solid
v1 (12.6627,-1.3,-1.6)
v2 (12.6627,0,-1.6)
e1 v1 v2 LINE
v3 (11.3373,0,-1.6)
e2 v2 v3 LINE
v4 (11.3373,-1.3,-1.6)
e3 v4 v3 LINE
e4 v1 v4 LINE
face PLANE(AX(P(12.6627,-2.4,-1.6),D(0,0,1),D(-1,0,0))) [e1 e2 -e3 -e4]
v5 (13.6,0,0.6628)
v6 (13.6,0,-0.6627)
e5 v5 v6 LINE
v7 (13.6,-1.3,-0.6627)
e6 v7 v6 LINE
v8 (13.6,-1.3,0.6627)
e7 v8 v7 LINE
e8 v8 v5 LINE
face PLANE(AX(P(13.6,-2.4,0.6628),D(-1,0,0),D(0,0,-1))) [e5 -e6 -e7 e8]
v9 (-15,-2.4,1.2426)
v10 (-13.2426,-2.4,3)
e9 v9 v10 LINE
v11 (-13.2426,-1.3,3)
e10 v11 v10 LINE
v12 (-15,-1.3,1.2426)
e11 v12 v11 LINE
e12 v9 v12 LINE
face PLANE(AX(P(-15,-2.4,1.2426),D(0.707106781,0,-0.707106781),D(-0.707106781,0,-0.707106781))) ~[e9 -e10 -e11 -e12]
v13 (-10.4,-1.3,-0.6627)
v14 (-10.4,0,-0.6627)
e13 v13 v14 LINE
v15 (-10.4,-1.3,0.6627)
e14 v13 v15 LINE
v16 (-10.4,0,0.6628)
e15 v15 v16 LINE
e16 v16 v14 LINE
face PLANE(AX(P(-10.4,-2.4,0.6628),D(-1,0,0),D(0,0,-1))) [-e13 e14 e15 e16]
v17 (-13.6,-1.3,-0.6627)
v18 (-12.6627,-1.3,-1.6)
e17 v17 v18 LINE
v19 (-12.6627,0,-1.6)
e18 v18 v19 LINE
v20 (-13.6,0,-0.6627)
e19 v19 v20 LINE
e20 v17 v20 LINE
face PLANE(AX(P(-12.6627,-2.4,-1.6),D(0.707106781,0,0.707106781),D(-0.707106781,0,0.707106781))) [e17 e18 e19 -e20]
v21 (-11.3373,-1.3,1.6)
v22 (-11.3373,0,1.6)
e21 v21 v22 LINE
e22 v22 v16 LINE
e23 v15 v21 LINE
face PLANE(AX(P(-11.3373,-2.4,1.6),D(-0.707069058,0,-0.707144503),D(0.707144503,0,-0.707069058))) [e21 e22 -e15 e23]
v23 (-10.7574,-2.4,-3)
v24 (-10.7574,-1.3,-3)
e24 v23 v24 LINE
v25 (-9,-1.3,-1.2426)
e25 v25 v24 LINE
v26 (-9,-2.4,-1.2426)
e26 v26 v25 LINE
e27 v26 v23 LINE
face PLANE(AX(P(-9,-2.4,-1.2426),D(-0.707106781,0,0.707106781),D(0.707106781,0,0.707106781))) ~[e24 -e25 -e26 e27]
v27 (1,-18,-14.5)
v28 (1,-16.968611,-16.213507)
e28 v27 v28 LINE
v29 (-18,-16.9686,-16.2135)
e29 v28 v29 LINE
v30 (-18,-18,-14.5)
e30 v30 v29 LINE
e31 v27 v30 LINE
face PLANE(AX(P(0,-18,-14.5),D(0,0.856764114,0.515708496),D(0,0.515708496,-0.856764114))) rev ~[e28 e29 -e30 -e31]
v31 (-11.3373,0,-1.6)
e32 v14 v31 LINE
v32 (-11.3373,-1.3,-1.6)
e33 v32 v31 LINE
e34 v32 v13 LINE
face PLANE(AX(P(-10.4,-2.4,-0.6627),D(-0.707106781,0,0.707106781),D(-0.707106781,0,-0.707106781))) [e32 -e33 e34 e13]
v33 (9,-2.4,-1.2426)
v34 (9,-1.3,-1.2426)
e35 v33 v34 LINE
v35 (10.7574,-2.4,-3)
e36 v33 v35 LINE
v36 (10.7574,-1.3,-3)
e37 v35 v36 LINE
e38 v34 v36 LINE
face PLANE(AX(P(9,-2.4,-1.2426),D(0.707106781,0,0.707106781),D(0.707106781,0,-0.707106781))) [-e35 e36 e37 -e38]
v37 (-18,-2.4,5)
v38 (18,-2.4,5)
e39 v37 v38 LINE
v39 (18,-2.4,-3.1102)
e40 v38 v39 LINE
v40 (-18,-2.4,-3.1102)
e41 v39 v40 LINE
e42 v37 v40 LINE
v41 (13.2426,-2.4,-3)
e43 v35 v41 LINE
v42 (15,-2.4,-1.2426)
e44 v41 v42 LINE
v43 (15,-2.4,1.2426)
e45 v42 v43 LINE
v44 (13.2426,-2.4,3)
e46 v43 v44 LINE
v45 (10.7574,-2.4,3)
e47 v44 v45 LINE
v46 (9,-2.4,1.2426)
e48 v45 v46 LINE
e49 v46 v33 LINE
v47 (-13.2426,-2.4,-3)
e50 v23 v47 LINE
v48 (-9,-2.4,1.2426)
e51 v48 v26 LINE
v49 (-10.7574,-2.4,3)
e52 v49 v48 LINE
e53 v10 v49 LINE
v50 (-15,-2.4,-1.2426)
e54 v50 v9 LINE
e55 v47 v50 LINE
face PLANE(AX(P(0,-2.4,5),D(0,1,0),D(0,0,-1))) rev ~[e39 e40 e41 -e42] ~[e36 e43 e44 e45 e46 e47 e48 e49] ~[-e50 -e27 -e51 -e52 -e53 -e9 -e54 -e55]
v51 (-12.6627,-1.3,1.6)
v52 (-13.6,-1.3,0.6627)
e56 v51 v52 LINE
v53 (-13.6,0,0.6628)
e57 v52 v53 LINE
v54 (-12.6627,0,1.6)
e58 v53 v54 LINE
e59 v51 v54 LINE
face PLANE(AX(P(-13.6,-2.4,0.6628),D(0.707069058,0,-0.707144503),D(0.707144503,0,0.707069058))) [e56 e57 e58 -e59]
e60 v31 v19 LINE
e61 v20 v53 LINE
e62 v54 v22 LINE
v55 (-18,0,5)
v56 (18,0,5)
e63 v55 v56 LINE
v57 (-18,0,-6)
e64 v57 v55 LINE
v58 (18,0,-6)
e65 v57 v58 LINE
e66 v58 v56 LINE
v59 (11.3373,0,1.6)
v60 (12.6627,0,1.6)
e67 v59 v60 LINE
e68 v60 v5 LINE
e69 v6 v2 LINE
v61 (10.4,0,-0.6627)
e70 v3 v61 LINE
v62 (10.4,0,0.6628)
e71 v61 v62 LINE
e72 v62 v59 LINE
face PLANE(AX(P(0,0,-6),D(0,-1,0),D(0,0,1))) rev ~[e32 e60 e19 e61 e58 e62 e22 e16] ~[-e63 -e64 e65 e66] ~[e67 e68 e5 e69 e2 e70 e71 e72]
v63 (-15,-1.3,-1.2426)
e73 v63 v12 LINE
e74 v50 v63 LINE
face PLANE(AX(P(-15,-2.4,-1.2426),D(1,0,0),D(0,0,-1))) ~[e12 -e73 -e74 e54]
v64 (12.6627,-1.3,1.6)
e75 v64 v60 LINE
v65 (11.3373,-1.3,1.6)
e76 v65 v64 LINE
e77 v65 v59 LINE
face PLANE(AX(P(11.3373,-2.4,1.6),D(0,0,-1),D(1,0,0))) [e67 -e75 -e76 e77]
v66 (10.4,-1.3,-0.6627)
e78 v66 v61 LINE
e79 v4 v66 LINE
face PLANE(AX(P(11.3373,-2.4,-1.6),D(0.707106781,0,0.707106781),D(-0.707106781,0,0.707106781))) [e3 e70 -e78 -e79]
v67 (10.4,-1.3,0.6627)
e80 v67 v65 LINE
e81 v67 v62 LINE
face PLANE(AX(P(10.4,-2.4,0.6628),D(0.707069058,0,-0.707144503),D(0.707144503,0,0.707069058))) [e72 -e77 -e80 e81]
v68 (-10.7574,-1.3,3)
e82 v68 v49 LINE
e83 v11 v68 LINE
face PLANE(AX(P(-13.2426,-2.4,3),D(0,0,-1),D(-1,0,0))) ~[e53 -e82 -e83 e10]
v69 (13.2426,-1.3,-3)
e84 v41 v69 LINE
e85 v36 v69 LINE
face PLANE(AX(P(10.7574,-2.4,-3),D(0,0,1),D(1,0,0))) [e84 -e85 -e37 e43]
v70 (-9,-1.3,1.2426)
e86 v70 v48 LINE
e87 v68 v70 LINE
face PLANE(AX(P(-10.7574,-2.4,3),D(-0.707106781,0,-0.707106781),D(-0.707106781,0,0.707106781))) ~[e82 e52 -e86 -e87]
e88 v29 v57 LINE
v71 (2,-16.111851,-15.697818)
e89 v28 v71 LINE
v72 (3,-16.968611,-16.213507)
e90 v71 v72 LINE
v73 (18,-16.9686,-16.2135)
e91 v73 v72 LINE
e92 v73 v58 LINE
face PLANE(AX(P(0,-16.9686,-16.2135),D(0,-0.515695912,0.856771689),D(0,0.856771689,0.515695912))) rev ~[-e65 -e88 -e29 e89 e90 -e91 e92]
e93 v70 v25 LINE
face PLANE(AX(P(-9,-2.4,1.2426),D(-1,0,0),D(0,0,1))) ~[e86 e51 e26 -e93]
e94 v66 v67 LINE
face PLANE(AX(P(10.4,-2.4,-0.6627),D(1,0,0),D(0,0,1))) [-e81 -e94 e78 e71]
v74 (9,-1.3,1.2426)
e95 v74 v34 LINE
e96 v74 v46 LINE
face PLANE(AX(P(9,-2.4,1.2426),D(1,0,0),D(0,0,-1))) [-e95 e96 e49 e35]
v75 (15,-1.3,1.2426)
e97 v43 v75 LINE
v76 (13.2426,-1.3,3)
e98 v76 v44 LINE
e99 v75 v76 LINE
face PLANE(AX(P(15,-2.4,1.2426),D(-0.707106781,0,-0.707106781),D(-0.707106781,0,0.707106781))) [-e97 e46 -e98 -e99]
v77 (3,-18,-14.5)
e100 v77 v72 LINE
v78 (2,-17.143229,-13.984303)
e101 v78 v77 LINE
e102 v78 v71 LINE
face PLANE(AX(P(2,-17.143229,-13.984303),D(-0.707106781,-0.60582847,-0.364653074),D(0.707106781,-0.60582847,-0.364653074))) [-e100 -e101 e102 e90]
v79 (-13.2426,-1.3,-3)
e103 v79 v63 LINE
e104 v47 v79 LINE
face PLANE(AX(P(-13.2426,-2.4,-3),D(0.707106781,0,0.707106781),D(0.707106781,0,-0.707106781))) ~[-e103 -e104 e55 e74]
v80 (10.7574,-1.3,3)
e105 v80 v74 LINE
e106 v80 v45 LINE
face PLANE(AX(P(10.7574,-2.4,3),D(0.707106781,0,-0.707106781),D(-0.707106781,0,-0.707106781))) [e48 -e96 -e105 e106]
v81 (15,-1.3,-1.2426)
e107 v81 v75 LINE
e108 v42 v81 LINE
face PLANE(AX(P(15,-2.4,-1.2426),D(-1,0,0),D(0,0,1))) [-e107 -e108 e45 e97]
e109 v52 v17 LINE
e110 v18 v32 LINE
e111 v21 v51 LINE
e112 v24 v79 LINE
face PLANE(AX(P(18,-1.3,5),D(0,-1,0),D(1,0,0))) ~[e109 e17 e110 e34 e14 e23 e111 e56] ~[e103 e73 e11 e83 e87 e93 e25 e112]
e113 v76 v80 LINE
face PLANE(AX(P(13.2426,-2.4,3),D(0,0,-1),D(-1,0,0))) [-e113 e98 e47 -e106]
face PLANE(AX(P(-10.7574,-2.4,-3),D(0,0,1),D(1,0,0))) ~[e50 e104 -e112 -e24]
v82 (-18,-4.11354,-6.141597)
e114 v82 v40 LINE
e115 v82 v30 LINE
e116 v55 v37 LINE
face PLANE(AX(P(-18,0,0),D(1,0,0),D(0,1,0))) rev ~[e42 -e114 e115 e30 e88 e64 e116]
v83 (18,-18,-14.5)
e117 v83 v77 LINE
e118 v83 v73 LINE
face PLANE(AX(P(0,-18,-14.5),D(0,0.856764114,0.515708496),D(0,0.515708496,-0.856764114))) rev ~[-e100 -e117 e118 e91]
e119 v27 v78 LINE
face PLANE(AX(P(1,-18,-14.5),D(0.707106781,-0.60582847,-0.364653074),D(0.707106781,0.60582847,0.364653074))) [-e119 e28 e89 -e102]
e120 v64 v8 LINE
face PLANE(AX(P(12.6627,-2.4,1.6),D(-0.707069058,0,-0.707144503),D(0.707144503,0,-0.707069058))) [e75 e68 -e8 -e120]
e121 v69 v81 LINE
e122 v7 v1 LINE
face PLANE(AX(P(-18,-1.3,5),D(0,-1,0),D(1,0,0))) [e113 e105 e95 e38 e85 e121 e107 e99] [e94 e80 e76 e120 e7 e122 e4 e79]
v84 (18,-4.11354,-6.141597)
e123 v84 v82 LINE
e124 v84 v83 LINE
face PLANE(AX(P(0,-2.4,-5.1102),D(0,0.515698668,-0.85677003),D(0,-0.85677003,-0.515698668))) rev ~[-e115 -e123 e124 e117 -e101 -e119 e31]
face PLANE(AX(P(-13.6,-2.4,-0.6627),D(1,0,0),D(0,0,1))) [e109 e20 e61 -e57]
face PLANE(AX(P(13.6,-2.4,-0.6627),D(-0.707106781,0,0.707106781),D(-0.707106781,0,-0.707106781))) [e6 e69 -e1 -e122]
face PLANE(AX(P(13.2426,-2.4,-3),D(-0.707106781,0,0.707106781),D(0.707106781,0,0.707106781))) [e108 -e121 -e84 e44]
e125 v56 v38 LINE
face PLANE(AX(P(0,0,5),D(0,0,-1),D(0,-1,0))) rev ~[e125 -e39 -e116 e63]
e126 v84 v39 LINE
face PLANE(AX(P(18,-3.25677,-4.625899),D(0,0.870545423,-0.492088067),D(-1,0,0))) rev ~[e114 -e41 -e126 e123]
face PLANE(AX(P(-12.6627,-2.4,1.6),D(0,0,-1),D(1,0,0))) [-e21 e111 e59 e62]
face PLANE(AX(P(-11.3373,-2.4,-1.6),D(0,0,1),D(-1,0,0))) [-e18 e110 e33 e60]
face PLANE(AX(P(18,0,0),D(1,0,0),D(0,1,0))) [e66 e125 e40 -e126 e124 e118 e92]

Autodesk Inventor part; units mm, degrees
ref_plane "YZ Plane" through (0, 0, 0) normal (1, 0, 0) x (0, 1, 0)
ref_plane "XZ Plane" through (0, 0, 0) normal (0, 1, 0) x (-1, 0, 0)
ref_plane "XY Plane" through (0, 0, 0) normal (0, 0, 1) x (1, 0, 0)
sketch "Skizze1" plane through (0, 0, 0) normal (1, 0, 0) x (0, 1, 0)
  line L0 (0, -6) -> (0, 5)
  line L1 (0, 5) -> (-2.4, 5)
  line L2 (-2.4, 5) -> (-2.4, -5.1102)
  line L3 (-2.4, -5.1102) -> (-18, -14.5)
  line L4 (-18, -14.5) -> (-16.9686, -16.2135)
  line L5 (-16.9686, -16.2135) -> (0, -6)
  point P0 (0, 0)
  point P1 (0, -0.5)
  dimension "d0" = 5
  dimension "d1" = 2.4
  dimension "d3" = 14
  dimension "d4" = 18
  dimension "d12" = 2
  dimension "d15" = 6
extrude "Extrusion1" add sketch "Skizze1" along normal mid plane 36
sketch "Skizze2" plane through (-18, -2.4, -5.1102) normal (0, -1, 0) x (1, 0, 0)
  line L0 (18, 14.3529) -> (18, -15.346) construction
  line L1 (31.6, 4.4475) -> (30.6627, 3.5102)
  line L2 (30.6627, 3.5102) -> (29.3373, 3.5102)
  line L3 (29.3373, 3.5102) -> (28.4, 4.4475)
  line L4 (28.4, 4.4475) -> (28.4, 5.773)
  line L5 (28.4, 5.773) -> (29.3373, 6.7102)
  line L6 (29.3373, 6.7102) -> (30.6627, 6.7102)
  line L7 (30.6627, 6.7102) -> (31.6, 5.773)
  line L8 (31.6, 5.773) -> (31.6, 4.4475)
  line L9 (7.6, 4.4475) -> (6.6627, 3.5102)
  line L10 (6.6627, 3.5102) -> (5.3373, 3.5102)
  line L11 (5.3373, 3.5102) -> (4.4, 4.4475)
  line L12 (4.4, 4.4475) -> (4.4, 5.773)
  line L13 (4.4, 5.773) -> (5.3373, 6.7102)
  line L14 (5.3373, 6.7102) -> (6.6627, 6.7102)
  line L15 (6.6627, 6.7102) -> (7.6, 5.773)
  line L16 (7.6, 5.773) -> (7.6, 4.4475)
  line L17 (-7.2, 5.1102) -> (43.2, 5.1102) construction
  point P0 (18, 5.1102)
  point P1 (30, 5.1102)
  point P2 (6, 5.1102)
  dimension "d8" = 3.2
  dimension "d9" = 24
extrude "Extrusion2" cut sketch "Skizze2" against normal through all
chamfer "Fase1" distance 2 angle 45 1 edges at (0, -2.4, -5.1102)
sketch "Skizze3" plane through (-18, -2.4, 5) normal (0, -1, 0) x (1, 0, 0)
  line L0 (36, -8.1102) -> (0, -8.1102) projected
  line L1 (36, 0) -> (36, -8.1102) projected
  line L2 (0, 0) -> (36, 0) projected
  line L3 (0, -8.1102) -> (0, 0) projected
  line L4 (29.3373, -3.4) -> (30.6627, -3.4) projected
  line L5 (30.6627, -3.4) -> (31.6, -4.3373) projected
  line L6 (31.6, -4.3373) -> (31.6, -5.6627) projected
  line L7 (31.6, -5.6627) -> (30.6627, -6.6) projected
  line L8 (30.6627, -6.6) -> (29.3373, -6.6) projected
  line L9 (29.3373, -6.6) -> (28.4, -5.6627) projected
  line L10 (28.4, -5.6627) -> (28.4, -4.3373) projected
  line L11 (28.4, -4.3373) -> (29.3373, -3.4) projected
  line L12 (5.3373, -3.4) -> (6.6627, -3.4) projected
  line L13 (6.6627, -3.4) -> (7.6, -4.3373) projected
  line L14 (7.6, -4.3373) -> (7.6, -5.6627) projected
  line L15 (7.6, -5.6627) -> (6.6627, -6.6) projected
  line L16 (6.6627, -6.6) -> (5.3373, -6.6) projected
  line L17 (5.3373, -6.6) -> (4.4, -5.6627) projected
  line L18 (4.4, -5.6627) -> (4.4, -4.3373) projected
  line L19 (4.4, -4.3373) -> (5.3373, -3.4) projected
  line L20 (31.2426, -2) -> (28.7574, -2)
  line L21 (28.7574, -2) -> (27, -3.7574)
  line L22 (27, -3.7574) -> (27, -6.2426)
  line L23 (27, -6.2426) -> (28.7574, -8)
  line L24 (28.7574, -8) -> (31.2426, -8)
  line L25 (31.2426, -8) -> (33, -6.2426)
  line L26 (33, -6.2426) -> (33, -3.7574)
  line L27 (33, -3.7574) -> (31.2426, -2)
  point P0 (18, -5)
  point P1 (28.2105, -7.4531)
  point P2 (31.7895, -7.4531)
  dimension "d19" = 6
extrude "Extrusion3" cut sketch "Skizze3" along normal mid plane 2.2 contours L27 L26 L25 L24 L23 L22 L21 L20
mirror "Spiegeln1" about plane through (0, 0, 0) normal (1, 0, 0) of "Extrusion3"
sketch "Skizze4" plane through (-18, -18, -14.5) normal (0, -0.5156973, 0.8567708) x (1, 0, 0)
  line L0 (0, 16.2079) -> (36, 16.2079) projected
  line L1 (0, 0) -> (0, 16.2079) projected
  line L2 (0, 0) -> (36, 0) projected
  line L3 (36, 16.2079) -> (36, 0) projected
  line L4 (18, 32.4901) -> (18, -6.446) construction
  line L5 (19, 0) -> (20, 1)
  line L6 (20, 1) -> (21, 0)
  line L7 (20, 1) -> (20, 0) construction
  point P0 (18, 22.8995)
  dimension "d22" = 1
  dimension "d23" = 1
extrude "Extrusion4" cut sketch "Skizze4" against normal through all contours L5 L6 L2
mirror "Spiegeln2" [suppressed]
properties part number "Dribblerdaempfer Flex" material "Gummi, Silikon"
